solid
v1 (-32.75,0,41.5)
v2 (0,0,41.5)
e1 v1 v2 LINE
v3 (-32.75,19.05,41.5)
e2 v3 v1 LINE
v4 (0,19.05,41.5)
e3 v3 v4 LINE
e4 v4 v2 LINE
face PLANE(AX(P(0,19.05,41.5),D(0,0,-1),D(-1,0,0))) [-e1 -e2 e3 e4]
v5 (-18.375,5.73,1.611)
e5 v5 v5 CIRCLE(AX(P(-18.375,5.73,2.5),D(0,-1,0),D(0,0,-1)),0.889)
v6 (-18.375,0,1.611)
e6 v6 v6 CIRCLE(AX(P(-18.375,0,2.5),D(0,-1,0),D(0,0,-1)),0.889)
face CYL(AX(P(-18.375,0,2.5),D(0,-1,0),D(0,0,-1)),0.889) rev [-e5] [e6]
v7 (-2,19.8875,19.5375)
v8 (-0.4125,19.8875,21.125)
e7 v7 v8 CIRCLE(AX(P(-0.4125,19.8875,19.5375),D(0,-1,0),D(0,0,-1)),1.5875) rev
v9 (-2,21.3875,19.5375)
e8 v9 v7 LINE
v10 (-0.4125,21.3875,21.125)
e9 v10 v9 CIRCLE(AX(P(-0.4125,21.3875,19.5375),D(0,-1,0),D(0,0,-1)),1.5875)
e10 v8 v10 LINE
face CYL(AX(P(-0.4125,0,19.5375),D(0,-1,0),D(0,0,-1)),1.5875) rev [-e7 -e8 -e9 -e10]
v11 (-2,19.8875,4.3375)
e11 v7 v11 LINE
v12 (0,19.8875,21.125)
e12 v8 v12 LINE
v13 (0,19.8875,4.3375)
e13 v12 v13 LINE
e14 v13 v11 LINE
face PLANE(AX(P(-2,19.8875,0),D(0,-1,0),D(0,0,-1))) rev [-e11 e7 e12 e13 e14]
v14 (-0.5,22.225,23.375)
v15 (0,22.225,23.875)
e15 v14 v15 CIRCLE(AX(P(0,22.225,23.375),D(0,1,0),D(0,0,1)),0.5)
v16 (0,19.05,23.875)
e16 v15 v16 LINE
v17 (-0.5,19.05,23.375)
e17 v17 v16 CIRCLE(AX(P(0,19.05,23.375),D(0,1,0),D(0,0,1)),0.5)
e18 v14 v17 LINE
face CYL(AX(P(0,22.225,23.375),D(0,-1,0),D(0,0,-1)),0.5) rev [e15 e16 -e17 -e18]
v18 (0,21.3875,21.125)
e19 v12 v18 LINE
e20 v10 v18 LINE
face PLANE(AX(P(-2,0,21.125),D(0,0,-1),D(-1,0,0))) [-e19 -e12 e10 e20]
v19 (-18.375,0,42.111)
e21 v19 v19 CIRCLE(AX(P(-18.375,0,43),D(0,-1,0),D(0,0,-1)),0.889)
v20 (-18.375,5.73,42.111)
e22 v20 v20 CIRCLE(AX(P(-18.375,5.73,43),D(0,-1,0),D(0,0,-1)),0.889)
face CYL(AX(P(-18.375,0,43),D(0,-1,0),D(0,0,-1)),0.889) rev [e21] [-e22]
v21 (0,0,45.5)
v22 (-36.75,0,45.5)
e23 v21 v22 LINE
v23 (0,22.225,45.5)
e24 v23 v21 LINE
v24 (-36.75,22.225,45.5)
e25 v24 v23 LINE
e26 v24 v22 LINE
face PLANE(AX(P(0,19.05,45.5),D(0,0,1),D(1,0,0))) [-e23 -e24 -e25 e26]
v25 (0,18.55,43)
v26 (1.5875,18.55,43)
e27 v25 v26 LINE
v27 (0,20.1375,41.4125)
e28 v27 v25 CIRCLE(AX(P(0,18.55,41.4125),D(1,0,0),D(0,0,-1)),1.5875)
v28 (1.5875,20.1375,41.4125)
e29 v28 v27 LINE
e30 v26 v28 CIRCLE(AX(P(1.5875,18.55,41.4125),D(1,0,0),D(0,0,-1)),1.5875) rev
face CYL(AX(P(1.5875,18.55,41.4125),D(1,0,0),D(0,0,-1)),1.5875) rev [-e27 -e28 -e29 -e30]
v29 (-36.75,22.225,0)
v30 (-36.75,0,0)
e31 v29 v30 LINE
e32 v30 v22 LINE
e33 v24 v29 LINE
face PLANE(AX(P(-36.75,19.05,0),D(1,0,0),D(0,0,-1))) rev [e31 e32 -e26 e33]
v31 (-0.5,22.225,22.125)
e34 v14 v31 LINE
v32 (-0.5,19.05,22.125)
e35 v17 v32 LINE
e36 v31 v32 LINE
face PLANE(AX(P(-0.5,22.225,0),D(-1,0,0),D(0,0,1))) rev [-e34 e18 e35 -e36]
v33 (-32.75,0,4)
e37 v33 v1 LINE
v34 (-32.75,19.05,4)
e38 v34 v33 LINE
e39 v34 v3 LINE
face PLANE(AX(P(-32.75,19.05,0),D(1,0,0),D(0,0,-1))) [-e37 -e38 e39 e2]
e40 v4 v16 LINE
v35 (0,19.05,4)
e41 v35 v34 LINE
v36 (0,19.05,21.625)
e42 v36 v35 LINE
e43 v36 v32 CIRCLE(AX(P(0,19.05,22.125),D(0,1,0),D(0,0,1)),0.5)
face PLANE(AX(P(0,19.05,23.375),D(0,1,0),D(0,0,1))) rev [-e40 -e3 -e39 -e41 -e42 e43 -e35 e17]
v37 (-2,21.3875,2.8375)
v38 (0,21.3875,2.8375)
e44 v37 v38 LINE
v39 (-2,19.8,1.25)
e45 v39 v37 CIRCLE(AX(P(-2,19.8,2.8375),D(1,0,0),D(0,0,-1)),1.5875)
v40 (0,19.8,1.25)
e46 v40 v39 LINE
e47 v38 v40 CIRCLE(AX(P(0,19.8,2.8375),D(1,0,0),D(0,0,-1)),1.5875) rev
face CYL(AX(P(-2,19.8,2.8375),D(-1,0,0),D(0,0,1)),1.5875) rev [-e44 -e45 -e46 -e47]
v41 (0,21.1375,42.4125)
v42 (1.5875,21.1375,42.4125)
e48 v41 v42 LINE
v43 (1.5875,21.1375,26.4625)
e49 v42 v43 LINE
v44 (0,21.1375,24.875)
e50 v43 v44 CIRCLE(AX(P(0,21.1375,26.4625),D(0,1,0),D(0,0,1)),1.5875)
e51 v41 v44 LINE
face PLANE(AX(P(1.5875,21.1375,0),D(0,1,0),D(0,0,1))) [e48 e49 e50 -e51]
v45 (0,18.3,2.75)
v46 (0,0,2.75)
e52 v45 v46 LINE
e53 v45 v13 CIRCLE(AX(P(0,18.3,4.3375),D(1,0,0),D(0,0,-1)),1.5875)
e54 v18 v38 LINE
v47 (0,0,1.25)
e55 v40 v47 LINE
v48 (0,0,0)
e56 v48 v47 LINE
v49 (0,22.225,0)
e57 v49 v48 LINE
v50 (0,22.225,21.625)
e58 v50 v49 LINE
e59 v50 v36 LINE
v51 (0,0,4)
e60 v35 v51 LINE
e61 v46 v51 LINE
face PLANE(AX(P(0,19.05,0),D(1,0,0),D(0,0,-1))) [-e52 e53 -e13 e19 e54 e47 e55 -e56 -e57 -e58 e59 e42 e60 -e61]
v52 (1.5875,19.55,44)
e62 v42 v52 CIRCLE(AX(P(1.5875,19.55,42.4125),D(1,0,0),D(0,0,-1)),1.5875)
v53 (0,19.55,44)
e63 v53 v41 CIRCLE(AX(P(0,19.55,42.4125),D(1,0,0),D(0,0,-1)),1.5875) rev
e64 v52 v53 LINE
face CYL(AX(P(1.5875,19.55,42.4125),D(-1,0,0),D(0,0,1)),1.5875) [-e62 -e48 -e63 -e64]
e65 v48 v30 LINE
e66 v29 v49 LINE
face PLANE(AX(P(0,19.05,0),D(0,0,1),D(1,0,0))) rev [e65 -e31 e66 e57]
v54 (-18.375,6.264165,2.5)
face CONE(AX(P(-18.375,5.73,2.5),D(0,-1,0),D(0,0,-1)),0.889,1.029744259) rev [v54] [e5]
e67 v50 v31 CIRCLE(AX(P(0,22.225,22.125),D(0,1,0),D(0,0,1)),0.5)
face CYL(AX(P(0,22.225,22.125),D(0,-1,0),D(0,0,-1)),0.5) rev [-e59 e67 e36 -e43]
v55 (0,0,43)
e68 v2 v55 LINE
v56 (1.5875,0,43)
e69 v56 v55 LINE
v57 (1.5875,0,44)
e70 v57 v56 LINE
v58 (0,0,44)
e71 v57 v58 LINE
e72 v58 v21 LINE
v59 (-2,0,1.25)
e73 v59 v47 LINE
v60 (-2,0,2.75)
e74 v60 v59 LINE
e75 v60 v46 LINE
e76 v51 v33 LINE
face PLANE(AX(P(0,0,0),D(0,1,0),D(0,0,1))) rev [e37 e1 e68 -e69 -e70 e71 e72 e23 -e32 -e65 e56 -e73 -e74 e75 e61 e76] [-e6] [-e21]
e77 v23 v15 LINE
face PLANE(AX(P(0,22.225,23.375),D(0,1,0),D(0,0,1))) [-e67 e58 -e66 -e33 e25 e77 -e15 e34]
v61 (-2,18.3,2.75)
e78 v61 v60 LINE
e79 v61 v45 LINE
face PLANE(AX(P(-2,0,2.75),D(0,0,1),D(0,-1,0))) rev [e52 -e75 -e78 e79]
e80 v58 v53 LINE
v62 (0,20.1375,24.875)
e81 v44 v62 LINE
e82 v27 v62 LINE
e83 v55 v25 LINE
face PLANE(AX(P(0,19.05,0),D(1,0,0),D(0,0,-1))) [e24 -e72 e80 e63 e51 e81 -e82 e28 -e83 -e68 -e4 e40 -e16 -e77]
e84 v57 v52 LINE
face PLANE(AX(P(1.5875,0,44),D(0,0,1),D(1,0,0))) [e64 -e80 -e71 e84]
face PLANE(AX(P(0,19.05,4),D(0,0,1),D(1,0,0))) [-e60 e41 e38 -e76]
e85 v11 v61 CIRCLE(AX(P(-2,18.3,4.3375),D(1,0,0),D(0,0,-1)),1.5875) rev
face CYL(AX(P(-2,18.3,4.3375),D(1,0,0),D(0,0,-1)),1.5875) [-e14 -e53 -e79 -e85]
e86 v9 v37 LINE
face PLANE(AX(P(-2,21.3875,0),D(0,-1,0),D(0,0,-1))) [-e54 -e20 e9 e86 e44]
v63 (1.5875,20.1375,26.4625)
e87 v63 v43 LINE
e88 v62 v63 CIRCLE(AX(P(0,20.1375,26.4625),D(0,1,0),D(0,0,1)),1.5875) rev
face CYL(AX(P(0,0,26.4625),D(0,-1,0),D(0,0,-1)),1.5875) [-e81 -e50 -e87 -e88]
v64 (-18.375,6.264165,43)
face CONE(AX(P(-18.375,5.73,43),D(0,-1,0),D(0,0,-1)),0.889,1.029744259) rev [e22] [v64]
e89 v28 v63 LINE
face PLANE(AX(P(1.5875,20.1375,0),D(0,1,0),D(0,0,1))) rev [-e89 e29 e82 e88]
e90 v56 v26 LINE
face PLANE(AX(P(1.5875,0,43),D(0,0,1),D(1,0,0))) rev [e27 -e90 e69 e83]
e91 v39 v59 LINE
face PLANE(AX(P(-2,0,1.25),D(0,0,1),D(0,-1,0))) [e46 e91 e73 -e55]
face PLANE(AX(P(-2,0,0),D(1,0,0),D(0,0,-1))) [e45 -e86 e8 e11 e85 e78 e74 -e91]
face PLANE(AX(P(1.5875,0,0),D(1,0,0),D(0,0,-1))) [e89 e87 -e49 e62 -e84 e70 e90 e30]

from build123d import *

# Parameters (mm, degrees)
WALL_DEPTH                = 19.05
ROOF_START                = 19.05
ROOF_DEPTH                = 3.175
F_2_56_TAPPED_HOLE1_D     = 1.778
F_2_56_TAPPED_HOLE1_DEPTH = 5.73
F_2_56_TAPPED_HOLE1_TIP   = 0.53416509
BOSS_EXTRUDE1_DEPTH       = 1.5875
CUT_EXTRUDE3_DEPTH        = 2
FILLET1_R                 = 1.5875


with BuildPart() as part:
    # MainSketch → Wall (new body)
    with BuildSketch(Plane(origin=(0, 0, 0), x_dir=(1, 0, 0), z_dir=(0, 1, 0))):
        Polygon((-32.75, -4), (0, -4), (0, 0), (-36.75, 0), (-36.75, -45.5), (0, -45.5), (0, -41.5), (-32.75, -41.5), align=None)
    extrude(amount=WALL_DEPTH)

    # MainSketch<3> → Roof (add)
    with BuildSketch(Plane(origin=(0, 0, 0), x_dir=(1, 0, 0), z_dir=(0, 1, 0)).offset(ROOF_START)):
        with BuildLine():
            Line((0, -21.625), (0, 0))
            Line((0, 0), (-36.75, 0))
            Line((-36.75, 0), (-36.75, -45.5))
            Line((-36.75, -45.5), (0, -45.5))
            Line((0, -45.5), (0, -23.875))
            ThreePointArc((0, -23.875), (-0.353553391, -23.728553391), (-0.5, -23.375))
            Line((-0.5, -23.375), (-0.5, -22.125))
            ThreePointArc((-0.5, -22.125), (-0.353553391, -21.771446609), (0, -21.625))
        make_face()
    extrude(amount=ROOF_DEPTH)

    # #2-56 Tapped Hole1
    with Locations(Plane(origin=(-18.375, 0, 43), x_dir=(0, 0, -1), z_dir=(0, -1, 0))):
        with Locations((0, 0), (40.5, 0)):
            Hole(F_2_56_TAPPED_HOLE1_D / 2, depth=F_2_56_TAPPED_HOLE1_DEPTH)
            with Locations((0, 0, -(F_2_56_TAPPED_HOLE1_DEPTH + F_2_56_TAPPED_HOLE1_TIP / 2))):  # 118° drill point
                Cone(0, F_2_56_TAPPED_HOLE1_D / 2, F_2_56_TAPPED_HOLE1_TIP, mode=Mode.SUBTRACT)

    # Sketch3 → Boss-Extrude1 (add)
    with BuildSketch(Plane(origin=(0, 0, 0), x_dir=(0, 0, -1), z_dir=(1, 0, 0))):
        Polygon((-24.875, 21.1375), (-24.875, 20.1375), (-43, 20.1375), (-43, 0), (-44, 0), (-44, 21.1375), align=None)
    extrude(amount=BOSS_EXTRUDE1_DEPTH)

    # Sketch3<3> → Cut-Extrude3 (cut)
    with BuildSketch(Plane(origin=(0, 0, 0), x_dir=(0, 0, -1), z_dir=(1, 0, 0))):
        Polygon((-21.125, 19.8875), (-21.125, 21.3875), (-1.25, 21.3875), (-1.25, 0), (-2.75, 0), (-2.75, 19.8875), align=None)
    extrude(amount=-CUT_EXTRUDE3_DEPTH, mode=Mode.SUBTRACT)

    # Fillet1
    fillet1_edges = [part.edges().sort_by_distance(p)[0] for p in [
        (0.79375, 20.1375, 43),
        (0.79375, 21.1375, 44),
        (1.5875, 20.6375, 24.875),
        (-1, 21.3875, 1.25),
        (-1, 19.8875, 2.75),
        (-2, 20.6375, 21.125),
    ]]
    fillet(fillet1_edges, radius=FILLET1_R - 0.0001)  # a hair under: the kernel refuses the full size


solid = part.part
